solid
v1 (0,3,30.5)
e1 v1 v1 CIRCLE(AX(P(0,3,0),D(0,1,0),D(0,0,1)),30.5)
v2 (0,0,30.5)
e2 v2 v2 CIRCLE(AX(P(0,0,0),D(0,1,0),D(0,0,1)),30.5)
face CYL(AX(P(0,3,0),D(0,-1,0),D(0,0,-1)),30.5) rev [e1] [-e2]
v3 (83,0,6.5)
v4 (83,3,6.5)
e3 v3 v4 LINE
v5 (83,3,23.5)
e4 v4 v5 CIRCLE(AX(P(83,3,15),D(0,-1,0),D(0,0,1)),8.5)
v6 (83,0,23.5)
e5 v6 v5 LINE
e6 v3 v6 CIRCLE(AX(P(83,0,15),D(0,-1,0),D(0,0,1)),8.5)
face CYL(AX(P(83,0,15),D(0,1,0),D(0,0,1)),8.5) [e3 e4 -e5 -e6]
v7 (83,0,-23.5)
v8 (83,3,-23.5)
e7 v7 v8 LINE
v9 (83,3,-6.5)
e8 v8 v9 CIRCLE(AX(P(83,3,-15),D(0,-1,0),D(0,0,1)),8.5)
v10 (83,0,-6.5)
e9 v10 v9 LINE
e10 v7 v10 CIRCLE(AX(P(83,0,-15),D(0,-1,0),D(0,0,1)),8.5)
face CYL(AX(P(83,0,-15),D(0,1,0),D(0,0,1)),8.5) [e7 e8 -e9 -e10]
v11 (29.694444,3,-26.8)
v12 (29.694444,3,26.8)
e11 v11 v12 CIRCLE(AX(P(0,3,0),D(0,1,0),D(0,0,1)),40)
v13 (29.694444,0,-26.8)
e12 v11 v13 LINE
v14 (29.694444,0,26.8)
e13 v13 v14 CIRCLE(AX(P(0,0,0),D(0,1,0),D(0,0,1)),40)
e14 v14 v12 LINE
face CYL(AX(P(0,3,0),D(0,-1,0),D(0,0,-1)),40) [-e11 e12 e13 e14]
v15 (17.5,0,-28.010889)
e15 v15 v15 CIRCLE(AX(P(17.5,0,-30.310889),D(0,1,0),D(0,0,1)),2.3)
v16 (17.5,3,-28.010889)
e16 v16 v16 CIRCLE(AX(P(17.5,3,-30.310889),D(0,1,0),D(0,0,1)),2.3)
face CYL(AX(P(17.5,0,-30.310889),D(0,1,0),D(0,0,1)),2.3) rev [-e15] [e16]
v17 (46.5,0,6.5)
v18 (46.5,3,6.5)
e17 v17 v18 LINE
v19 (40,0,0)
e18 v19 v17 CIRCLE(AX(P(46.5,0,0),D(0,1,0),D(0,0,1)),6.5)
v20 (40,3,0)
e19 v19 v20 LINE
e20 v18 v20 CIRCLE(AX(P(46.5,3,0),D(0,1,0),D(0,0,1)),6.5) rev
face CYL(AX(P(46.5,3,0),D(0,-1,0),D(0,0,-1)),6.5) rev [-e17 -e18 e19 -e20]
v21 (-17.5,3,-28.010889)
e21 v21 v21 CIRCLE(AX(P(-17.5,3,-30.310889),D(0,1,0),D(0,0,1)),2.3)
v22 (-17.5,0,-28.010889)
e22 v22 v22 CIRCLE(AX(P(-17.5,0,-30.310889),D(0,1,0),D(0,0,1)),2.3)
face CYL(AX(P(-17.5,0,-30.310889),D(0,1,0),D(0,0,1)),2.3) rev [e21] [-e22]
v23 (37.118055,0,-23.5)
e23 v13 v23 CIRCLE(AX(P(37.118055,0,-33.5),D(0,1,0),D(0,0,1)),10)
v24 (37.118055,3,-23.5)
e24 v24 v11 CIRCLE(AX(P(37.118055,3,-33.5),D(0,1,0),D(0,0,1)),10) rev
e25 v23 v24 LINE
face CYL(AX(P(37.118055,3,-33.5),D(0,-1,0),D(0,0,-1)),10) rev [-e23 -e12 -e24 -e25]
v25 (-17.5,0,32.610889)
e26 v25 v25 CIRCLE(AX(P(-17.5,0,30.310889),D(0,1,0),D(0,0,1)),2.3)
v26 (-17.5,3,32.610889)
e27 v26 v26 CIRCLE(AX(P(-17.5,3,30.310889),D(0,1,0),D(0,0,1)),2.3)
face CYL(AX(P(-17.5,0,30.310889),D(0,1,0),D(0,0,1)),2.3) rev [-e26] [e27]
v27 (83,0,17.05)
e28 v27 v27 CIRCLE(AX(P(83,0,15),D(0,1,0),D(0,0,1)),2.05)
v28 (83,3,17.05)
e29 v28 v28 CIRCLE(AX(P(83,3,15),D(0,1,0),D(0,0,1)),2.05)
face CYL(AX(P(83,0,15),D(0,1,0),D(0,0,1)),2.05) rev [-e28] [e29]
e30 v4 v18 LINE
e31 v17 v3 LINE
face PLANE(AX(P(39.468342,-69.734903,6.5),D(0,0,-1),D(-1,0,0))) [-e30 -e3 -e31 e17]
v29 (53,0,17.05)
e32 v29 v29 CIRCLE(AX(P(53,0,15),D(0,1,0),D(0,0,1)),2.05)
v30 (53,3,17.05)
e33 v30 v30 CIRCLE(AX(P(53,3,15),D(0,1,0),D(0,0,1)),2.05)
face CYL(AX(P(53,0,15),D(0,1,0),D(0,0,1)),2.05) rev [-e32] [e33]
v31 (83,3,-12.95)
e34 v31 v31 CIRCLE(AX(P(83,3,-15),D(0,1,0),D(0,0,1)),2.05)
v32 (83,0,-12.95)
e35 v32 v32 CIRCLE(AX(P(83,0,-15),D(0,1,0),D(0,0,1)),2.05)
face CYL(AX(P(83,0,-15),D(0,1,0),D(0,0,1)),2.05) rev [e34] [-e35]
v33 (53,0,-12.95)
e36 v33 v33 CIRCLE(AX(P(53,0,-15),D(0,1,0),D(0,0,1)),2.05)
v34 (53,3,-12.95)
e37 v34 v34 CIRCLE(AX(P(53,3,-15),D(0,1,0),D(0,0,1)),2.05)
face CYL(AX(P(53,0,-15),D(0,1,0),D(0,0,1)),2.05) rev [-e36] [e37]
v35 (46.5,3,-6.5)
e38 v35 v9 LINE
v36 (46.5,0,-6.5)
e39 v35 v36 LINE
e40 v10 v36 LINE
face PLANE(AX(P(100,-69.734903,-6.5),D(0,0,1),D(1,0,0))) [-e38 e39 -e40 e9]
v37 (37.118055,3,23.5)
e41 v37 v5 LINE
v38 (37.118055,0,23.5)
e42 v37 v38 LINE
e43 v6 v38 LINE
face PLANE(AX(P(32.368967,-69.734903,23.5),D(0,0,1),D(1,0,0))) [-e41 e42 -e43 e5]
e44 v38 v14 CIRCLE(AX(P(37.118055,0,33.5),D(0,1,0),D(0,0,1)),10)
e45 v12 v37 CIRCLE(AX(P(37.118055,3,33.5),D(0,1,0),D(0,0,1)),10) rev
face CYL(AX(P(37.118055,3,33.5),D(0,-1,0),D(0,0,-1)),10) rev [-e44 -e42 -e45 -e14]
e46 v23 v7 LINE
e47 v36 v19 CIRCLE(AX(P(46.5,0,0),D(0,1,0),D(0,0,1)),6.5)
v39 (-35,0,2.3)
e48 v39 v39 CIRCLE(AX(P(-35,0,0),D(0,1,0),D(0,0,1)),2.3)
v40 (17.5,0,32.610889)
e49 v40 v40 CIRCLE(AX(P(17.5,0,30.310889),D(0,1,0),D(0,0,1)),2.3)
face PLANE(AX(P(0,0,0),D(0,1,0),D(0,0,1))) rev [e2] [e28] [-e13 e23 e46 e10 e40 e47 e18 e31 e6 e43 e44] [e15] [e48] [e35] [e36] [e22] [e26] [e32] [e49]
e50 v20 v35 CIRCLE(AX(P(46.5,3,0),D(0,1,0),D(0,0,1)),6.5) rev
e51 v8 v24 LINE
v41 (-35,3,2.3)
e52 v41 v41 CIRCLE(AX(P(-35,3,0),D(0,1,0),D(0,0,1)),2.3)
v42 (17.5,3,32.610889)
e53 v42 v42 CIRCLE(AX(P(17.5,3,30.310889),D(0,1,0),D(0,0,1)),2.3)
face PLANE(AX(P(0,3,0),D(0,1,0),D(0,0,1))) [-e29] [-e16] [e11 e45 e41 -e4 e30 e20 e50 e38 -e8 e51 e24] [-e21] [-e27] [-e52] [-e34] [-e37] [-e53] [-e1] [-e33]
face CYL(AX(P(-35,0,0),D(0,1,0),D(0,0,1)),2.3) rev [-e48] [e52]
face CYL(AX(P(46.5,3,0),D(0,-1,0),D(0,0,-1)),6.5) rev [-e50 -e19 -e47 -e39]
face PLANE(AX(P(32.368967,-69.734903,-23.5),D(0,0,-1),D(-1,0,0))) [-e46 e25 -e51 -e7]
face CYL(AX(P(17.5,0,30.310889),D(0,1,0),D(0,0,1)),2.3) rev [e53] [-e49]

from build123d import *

# Parameters (mm, degrees)
SKETCH1_R           = 40
SKETCH1_R_2         = 30.5
BOSS_EXTRUDE1_DEPTH = 3
BOSS_EXTRUDE2_START = -3
BOSS_EXTRUDE2_DEPTH = 3
SKETCH3_R           = 2.05
CUT_EXTRUDE1_DEPTH  = 108.745069493
SKETCH4_R           = 2.3
CUT_EXTRUDE2_DEPTH  = 108.745069493
CUT_EXTRUDE3_DEPTH  = 108.745069493
FILLET1_R           = 10
FILLET2_R           = 6.5


with BuildPart() as part:
    # Sketch1 → Boss-Extrude1 (new body)
    with BuildSketch(Plane(origin=(0, 0, 0), x_dir=(1, 0, 0), z_dir=(0, 1, 0))):
        with Locations(Location((0, 0, 0), (0, 0, 270))):
            Circle(SKETCH1_R)
        with Locations(Location((0, 0, 0), (0, 0, 270))):
            Circle(SKETCH1_R_2, mode=Mode.SUBTRACT)
    extrude(amount=BOSS_EXTRUDE1_DEPTH)

    # Sketch2 → Boss-Extrude2 (add)
    with BuildSketch(Plane(origin=(0, 3, 0), x_dir=(1, 0, 0), z_dir=(0, 1, 0)).offset(BOSS_EXTRUDE2_START)):
        with BuildLine():
            Line((100, 6.5), (39.468341744, 6.5))
            ThreePointArc((39.468341744, 6.5), (36.910699238, 15.414288235), (32.368966619, 23.5))
            Line((32.368966619, 23.5), (100, 23.5))
            Line((100, 23.5), (100, 6.5))
        make_face()
        with BuildLine():
            Line((39.468341744, -6.5), (100, -6.5))
            Line((100, -6.5), (100, -23.5))
            Line((100, -23.5), (32.368966619, -23.5))
            ThreePointArc((32.368966619, -23.5), (36.910699238, -15.414288235), (39.468341744, -6.5))
        make_face()
    extrude(amount=BOSS_EXTRUDE2_DEPTH)

    # Sketch3 → Cut-Extrude1 (cut, through all)
    with BuildSketch(Plane(origin=(0, 3, 0), x_dir=(1, 0, 0), z_dir=(0, 1, 0))):
        with Locations(Location((53, 15, 0), (0, 0, 270))):
            Circle(SKETCH3_R)
        with Locations(Location((83, 15, 0), (0, 0, 270))):
            Circle(SKETCH3_R)
        with Locations(Location((53, -15, 0), (0, 0, 270))):
            Circle(SKETCH3_R)
        with Locations(Location((83, -15, 0), (0, 0, 270))):
            Circle(SKETCH3_R)
    extrude(amount=-CUT_EXTRUDE1_DEPTH, mode=Mode.SUBTRACT)

    # Sketch4 → Cut-Extrude2 (cut, through all)
    with BuildSketch(Plane(origin=(0, 3, 0), x_dir=(1, 0, 0), z_dir=(0, 1, 0))):
        with Locations(Location((-17.5, 30.310889132, 0), (0, 0, 270))):
            Circle(SKETCH4_R)
        with Locations(Location((17.5, 30.310889132, 0), (0, 0, 270))):
            Circle(SKETCH4_R)
        with Locations(Location((17.5, -30.310889132, 0), (0, 0, 270))):
            Circle(SKETCH4_R)
        with Locations(Location((-17.5, -30.310889132, 0), (0, 0, 270))):
            Circle(SKETCH4_R)
        with Locations(Location((-35, 0, 0), (0, 0, 270))):
            Circle(SKETCH4_R)
    extrude(amount=-CUT_EXTRUDE2_DEPTH, mode=Mode.SUBTRACT)

    # Sketch6 → Cut-Extrude3 (cut, through all)
    with BuildSketch(Plane(origin=(0, 3, 0), x_dir=(1, 0, 0), z_dir=(0, 1, 0))):
        with BuildLine():
            Line((100, 23.5), (83, 23.5))
            ThreePointArc((83, 23.5), (91.5, 15), (83, 6.5))
            Line((83, 6.5), (100, 6.5))
            Line((100, 6.5), (100, 23.5))
        make_face()
        with BuildLine():
            Line((100, -6.5), (83, -6.5))
            ThreePointArc((83, -6.5), (91.5, -15), (83, -23.5))
            Line((83, -23.5), (100, -23.5))
            Line((100, -23.5), (100, -6.5))
        make_face()
    extrude(amount=-CUT_EXTRUDE3_DEPTH, mode=Mode.SUBTRACT)

    # Fillet1
    fillet1_edges = [part.edges().sort_by_distance(p)[0] for p in [
        (32.368966619, 1.5, -23.5),
        (32.368966619, 1.5, 23.5),
    ]]
    fillet(fillet1_edges, radius=FILLET1_R)

    # Fillet2
    fillet2_edges = [part.edges().sort_by_distance(p)[0] for p in [
        (39.468341744, 1.5, 6.5),
        (39.468341744, 1.5, -6.5),
    ]]
    fillet(fillet2_edges, radius=FILLET2_R - 0.0001)  # a hair under: the kernel refuses the full size


solid = part.part
